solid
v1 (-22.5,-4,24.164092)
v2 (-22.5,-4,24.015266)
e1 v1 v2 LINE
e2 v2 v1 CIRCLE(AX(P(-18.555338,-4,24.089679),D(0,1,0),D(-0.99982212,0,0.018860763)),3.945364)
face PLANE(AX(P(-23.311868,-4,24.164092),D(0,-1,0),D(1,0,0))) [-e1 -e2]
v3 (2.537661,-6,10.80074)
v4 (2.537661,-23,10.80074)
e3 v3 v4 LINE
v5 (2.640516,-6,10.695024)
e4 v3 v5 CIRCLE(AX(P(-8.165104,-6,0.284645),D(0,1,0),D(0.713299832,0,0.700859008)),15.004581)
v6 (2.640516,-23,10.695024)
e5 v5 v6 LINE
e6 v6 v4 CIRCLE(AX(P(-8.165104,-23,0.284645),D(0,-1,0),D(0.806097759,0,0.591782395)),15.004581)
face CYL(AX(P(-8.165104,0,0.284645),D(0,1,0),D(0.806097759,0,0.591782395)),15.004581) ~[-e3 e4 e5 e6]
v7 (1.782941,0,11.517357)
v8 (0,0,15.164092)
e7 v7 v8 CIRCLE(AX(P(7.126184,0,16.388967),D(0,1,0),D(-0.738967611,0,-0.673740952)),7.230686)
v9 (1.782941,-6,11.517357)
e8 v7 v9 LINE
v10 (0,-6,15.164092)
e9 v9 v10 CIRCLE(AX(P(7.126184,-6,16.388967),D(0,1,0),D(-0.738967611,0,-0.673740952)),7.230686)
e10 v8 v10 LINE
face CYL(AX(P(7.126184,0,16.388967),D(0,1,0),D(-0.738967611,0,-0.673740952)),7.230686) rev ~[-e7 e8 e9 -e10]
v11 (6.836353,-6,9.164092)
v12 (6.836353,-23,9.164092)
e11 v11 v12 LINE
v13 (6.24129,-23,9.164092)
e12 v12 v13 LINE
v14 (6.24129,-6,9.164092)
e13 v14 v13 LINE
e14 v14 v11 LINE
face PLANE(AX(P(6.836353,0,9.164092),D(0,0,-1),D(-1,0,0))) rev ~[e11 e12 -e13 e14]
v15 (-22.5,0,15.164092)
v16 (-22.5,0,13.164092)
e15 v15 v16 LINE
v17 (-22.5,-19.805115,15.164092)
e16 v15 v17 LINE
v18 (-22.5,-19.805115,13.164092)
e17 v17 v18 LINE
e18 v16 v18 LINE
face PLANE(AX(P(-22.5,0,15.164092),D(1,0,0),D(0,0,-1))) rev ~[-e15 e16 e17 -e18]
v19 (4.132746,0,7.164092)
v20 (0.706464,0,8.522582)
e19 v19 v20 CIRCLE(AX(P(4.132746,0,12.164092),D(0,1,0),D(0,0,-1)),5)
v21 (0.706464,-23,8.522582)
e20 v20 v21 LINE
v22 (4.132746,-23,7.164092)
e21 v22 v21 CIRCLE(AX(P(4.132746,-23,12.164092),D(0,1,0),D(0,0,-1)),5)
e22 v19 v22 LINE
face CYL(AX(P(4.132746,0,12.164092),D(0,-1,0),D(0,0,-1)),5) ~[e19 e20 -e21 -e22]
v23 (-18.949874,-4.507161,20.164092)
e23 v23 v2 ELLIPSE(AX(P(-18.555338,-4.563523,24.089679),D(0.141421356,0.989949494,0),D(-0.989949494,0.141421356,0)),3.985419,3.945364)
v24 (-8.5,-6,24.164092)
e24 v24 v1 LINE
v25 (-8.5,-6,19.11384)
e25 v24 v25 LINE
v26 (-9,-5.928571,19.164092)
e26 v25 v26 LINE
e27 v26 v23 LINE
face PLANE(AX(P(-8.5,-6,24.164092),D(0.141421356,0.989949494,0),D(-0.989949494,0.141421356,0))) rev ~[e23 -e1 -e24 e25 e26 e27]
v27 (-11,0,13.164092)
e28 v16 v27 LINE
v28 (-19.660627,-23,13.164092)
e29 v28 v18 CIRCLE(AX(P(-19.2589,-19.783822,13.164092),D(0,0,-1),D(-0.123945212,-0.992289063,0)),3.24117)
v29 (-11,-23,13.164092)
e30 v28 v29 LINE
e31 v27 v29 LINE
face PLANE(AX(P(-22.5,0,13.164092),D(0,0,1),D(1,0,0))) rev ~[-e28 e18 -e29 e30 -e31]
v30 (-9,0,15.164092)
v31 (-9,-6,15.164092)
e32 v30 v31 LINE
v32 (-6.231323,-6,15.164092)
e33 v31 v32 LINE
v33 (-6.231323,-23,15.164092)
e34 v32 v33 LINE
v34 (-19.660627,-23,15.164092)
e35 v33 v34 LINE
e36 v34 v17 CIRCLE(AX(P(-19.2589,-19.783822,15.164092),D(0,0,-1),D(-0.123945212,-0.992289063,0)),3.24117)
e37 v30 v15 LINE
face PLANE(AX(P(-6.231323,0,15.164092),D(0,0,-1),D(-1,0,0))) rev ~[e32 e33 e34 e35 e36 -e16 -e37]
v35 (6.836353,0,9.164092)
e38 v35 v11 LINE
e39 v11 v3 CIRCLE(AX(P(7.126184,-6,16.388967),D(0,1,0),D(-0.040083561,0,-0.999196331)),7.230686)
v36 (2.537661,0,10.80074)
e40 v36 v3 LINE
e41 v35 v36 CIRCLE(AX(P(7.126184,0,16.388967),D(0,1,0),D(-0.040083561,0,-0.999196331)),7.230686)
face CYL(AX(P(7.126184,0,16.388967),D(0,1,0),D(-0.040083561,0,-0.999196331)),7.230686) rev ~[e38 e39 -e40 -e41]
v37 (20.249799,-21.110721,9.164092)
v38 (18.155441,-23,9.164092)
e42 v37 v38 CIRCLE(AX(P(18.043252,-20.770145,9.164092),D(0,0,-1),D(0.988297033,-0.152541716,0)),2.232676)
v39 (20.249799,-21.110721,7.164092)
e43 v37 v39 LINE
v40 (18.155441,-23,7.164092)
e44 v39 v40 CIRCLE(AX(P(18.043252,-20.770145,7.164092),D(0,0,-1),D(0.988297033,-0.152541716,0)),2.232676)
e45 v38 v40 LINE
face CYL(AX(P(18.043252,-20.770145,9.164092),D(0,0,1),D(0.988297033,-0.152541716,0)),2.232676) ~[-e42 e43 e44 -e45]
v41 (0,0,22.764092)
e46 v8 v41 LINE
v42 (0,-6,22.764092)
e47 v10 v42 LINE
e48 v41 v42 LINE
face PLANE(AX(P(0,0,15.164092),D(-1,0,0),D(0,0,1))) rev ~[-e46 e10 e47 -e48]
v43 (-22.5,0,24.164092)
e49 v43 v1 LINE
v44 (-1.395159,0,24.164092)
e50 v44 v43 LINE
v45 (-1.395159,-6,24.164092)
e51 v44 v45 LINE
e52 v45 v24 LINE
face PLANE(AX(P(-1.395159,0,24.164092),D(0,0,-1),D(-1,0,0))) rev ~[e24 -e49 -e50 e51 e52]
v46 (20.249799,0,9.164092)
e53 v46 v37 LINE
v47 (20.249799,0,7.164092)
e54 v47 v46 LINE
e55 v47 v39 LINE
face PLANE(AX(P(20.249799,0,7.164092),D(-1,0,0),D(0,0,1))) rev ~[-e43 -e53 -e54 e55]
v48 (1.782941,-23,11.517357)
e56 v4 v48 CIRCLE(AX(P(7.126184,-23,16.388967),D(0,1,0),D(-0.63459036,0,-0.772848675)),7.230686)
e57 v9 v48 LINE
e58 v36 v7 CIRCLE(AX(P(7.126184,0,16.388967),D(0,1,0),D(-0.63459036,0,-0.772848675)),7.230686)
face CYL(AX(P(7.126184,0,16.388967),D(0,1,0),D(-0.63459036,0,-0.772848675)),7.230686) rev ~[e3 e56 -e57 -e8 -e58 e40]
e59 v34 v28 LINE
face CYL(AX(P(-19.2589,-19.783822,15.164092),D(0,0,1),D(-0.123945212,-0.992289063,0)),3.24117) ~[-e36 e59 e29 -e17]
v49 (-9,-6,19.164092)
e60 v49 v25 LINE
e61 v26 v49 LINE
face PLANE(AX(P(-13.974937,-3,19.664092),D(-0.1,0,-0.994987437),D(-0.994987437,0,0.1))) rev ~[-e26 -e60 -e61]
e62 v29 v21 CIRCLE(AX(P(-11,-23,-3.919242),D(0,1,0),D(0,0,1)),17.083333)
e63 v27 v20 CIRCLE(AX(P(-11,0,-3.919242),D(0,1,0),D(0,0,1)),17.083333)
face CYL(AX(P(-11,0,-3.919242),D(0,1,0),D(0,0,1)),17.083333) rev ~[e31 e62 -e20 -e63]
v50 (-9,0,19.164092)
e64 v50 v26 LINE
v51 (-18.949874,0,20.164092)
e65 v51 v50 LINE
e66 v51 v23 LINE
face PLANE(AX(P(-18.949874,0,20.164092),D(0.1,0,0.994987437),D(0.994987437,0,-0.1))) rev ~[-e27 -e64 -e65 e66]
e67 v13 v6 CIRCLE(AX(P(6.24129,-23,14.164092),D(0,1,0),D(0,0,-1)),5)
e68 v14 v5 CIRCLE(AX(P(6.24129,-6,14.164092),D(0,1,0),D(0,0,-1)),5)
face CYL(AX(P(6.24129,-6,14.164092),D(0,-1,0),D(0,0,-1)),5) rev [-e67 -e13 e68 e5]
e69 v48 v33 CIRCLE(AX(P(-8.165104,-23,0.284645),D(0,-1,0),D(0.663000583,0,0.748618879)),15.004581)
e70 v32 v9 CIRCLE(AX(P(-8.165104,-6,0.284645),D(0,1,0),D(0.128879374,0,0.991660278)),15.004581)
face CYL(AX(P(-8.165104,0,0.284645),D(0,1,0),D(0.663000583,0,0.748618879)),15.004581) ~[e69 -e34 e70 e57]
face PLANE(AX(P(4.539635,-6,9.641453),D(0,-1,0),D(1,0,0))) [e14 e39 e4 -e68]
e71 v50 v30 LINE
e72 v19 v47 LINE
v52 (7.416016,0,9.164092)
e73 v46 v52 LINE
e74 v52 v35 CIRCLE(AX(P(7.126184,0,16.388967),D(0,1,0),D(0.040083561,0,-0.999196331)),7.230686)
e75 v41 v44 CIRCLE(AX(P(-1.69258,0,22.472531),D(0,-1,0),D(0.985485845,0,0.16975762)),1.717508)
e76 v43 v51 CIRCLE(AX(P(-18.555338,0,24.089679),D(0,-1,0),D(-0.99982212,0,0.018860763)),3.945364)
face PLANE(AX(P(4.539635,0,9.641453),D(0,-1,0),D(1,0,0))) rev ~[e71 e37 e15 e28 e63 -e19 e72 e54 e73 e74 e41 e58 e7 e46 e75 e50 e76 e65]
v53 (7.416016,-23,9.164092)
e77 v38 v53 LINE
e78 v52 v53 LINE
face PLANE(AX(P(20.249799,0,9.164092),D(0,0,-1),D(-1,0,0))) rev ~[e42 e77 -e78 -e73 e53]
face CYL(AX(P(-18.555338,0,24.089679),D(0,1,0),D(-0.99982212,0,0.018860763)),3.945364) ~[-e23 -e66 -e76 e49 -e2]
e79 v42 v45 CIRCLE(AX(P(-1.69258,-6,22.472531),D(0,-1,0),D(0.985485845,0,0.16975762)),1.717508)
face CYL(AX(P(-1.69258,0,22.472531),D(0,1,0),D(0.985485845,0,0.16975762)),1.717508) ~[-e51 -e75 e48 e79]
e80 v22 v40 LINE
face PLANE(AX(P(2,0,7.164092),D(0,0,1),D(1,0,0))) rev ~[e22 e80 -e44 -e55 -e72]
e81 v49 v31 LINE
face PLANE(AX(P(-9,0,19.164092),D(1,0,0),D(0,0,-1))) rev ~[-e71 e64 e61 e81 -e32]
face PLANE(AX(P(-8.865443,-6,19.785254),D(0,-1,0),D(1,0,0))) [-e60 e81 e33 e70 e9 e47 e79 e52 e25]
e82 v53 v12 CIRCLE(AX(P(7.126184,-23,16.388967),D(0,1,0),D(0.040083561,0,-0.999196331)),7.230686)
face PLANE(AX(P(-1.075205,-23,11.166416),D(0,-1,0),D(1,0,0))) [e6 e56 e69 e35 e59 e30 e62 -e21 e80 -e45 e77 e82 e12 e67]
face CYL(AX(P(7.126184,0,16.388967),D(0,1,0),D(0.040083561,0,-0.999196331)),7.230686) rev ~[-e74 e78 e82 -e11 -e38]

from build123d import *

# Parameters (mm, degrees)
F1_DEPTH  = 6
F2_DEPTH  = 23
F3_DEPTH  = 6
F4_R      = 5
F5_W      = 0.81186831
F5_H      = 2
F6_REACH  = 31.1431356237
F8_DEPTH  = 2
F10_DEPTH = 2
F11_R     = 5


with BuildPart() as f1:
    # F0 (on Front) → F1 (new body)
    with BuildSketch(Plane.XZ):
        with BuildLine():
            ThreePointArc((0, 22.7640915698), (-0.4760169509, 23.6848881741), (-1.3951592846, 24.1640915698))
            Line((-1.3951592846, 24.1640915698), (-22.5, 24.1640915698))
            ThreePointArc((-22.5, 24.1640915698), (-21.5061278282, 21.4707603394), (-18.9498743711, 20.1640915698))
            Line((-18.9498743711, 20.1640915698), (-9, 19.1640915698))
            Line((-9, 19.1640915698), (-9, 15.1640915698))
            Line((-9, 15.1640915698), (-6.2313233502, 15.1640915698))
            ThreePointArc((-6.2313233502, 15.1640915698), (-1.9506759829, 13.9418160027), (1.7829414728, 11.5173572715))
            ThreePointArc((1.7829414728, 11.5173572715), (0.6303147693, 13.2130414674), (0, 15.1640915698))
            Line((0, 15.1640915698), (0, 22.7640915698))
        make_face()
    extrude(amount=F1_DEPTH)

    # F0 (on Front) → F2 (join)
    with BuildSketch(Plane.XZ):
        with BuildLine():
            ThreePointArc((2.5376606134, 10.8007404291), (2.1473911285, 11.1454525194), (1.7829414728, 11.5173572715))
            ThreePointArc((1.7829414728, 11.5173572715), (-1.9506759829, 13.9418160027), (-6.2313233502, 15.1640915698))
            Line((-6.2313233502, 15.1640915698), (-9, 15.1640915698))
            Line((-9, 15.1640915698), (-22.5, 15.1640915698))
            Line((-22.5, 15.1640915698), (-22.5, 13.1640915698))
            Line((-22.5, 13.1640915698), (-11, 13.1640915698))
            ThreePointArc((-11, 13.1640915698), (-3.8410894684, 11.591731055), (2, 7.1640915698))
            Line((2, 7.1640915698), (20.2497988939, 7.1640915698))
            Line((20.2497988939, 7.1640915698), (20.2497988939, 9.1640915698))
            Line((20.2497988939, 9.1640915698), (7.4160159886, 9.1640915698))
            ThreePointArc((7.4160159886, 9.1640915698), (7.1261843392, 9.1582804924), (6.8363526899, 9.1640915698))
            Line((6.8363526899, 9.1640915698), (3.930054605, 9.1640915698))
            ThreePointArc((3.930054605, 9.1640915698), (3.2631933631, 10.0073736605), (2.5376606134, 10.8007404291))
        make_face()
    extrude(amount=F2_DEPTH)

    # F0 (on Front) → F3 (join)
    with BuildSketch(Plane.XZ):
        with BuildLine():
            ThreePointArc((6.8363526899, 9.1640915698), (4.5533954509, 9.6314834175), (2.5376606134, 10.8007404291))
            ThreePointArc((2.5376606134, 10.8007404291), (3.2631933631, 10.0073736605), (3.930054605, 9.1640915698))
            Line((3.930054605, 9.1640915698), (6.8363526899, 9.1640915698))
        make_face()
    extrude(amount=F3_DEPTH)

    # F4
    f4_edges = [f1.edges().sort_by_distance(p)[0] for p in [
        (3.930055, -14.5, 9.164092),
    ]]
    fillet(f4_edges, radius=F4_R)

    f6_end = Plane(origin=(-13.9749371855, -3, 19.6640915698), x_dir=(-0.9949874371, 0, 0.1), z_dir=(-0.1, 0, -0.9949874371))
    # F5 (on face) → F6 (cut, up to a plane its end follows)
    with BuildSketch(Plane.XY.offset(24.1640915698)):
        Polygon((-8.5, -6), (-22.5, -4), (-22.5, -6), align=None)
        with Locations((-22.905934155, -5)):
            Rectangle(F5_W, F5_H)
    f6_long = extrude(amount=-F6_REACH, mode=Mode.PRIVATE)
    add(split(f6_long, bisect_by=f6_end, keep=Keep.BOTTOM, mode=Mode.PRIVATE), mode=Mode.SUBTRACT)

    # F7 (on face) → F8 (cut, through all)
    with BuildSketch(Plane.XY.offset(15.1640915698)):
        with BuildLine():
            ThreePointArc((-19.6606274694, -23), (-21.6815784663, -21.9369160005), (-22.5, -19.8051147163))
            Line((-22.5, -19.8051147163), (-22.5, -23))
            Line((-22.5, -23), (-19.6606274694, -23))
        make_face()
    extrude(amount=-F8_DEPTH, mode=Mode.SUBTRACT)

    # F9 (on face) → F10 (cut, through all)
    with BuildSketch(Plane.XY.offset(9.1640915698)):
        with BuildLine():
            ThreePointArc((20.2497988939, -21.1107209325), (19.5387380379, -22.4279634054), (18.1554414653, -23))
            Line((18.1554414653, -23), (20.2497988939, -23))
            Line((20.2497988939, -23), (20.2497988939, -21.1107209325))
        make_face()
    extrude(amount=-F10_DEPTH, mode=Mode.SUBTRACT)

    # F11
    f11_edges = [f1.edges().sort_by_distance(p)[0] for p in [
        (2, -11.5, 7.164092),
    ]]
    fillet(f11_edges, radius=F11_R)


solid = f1.part
